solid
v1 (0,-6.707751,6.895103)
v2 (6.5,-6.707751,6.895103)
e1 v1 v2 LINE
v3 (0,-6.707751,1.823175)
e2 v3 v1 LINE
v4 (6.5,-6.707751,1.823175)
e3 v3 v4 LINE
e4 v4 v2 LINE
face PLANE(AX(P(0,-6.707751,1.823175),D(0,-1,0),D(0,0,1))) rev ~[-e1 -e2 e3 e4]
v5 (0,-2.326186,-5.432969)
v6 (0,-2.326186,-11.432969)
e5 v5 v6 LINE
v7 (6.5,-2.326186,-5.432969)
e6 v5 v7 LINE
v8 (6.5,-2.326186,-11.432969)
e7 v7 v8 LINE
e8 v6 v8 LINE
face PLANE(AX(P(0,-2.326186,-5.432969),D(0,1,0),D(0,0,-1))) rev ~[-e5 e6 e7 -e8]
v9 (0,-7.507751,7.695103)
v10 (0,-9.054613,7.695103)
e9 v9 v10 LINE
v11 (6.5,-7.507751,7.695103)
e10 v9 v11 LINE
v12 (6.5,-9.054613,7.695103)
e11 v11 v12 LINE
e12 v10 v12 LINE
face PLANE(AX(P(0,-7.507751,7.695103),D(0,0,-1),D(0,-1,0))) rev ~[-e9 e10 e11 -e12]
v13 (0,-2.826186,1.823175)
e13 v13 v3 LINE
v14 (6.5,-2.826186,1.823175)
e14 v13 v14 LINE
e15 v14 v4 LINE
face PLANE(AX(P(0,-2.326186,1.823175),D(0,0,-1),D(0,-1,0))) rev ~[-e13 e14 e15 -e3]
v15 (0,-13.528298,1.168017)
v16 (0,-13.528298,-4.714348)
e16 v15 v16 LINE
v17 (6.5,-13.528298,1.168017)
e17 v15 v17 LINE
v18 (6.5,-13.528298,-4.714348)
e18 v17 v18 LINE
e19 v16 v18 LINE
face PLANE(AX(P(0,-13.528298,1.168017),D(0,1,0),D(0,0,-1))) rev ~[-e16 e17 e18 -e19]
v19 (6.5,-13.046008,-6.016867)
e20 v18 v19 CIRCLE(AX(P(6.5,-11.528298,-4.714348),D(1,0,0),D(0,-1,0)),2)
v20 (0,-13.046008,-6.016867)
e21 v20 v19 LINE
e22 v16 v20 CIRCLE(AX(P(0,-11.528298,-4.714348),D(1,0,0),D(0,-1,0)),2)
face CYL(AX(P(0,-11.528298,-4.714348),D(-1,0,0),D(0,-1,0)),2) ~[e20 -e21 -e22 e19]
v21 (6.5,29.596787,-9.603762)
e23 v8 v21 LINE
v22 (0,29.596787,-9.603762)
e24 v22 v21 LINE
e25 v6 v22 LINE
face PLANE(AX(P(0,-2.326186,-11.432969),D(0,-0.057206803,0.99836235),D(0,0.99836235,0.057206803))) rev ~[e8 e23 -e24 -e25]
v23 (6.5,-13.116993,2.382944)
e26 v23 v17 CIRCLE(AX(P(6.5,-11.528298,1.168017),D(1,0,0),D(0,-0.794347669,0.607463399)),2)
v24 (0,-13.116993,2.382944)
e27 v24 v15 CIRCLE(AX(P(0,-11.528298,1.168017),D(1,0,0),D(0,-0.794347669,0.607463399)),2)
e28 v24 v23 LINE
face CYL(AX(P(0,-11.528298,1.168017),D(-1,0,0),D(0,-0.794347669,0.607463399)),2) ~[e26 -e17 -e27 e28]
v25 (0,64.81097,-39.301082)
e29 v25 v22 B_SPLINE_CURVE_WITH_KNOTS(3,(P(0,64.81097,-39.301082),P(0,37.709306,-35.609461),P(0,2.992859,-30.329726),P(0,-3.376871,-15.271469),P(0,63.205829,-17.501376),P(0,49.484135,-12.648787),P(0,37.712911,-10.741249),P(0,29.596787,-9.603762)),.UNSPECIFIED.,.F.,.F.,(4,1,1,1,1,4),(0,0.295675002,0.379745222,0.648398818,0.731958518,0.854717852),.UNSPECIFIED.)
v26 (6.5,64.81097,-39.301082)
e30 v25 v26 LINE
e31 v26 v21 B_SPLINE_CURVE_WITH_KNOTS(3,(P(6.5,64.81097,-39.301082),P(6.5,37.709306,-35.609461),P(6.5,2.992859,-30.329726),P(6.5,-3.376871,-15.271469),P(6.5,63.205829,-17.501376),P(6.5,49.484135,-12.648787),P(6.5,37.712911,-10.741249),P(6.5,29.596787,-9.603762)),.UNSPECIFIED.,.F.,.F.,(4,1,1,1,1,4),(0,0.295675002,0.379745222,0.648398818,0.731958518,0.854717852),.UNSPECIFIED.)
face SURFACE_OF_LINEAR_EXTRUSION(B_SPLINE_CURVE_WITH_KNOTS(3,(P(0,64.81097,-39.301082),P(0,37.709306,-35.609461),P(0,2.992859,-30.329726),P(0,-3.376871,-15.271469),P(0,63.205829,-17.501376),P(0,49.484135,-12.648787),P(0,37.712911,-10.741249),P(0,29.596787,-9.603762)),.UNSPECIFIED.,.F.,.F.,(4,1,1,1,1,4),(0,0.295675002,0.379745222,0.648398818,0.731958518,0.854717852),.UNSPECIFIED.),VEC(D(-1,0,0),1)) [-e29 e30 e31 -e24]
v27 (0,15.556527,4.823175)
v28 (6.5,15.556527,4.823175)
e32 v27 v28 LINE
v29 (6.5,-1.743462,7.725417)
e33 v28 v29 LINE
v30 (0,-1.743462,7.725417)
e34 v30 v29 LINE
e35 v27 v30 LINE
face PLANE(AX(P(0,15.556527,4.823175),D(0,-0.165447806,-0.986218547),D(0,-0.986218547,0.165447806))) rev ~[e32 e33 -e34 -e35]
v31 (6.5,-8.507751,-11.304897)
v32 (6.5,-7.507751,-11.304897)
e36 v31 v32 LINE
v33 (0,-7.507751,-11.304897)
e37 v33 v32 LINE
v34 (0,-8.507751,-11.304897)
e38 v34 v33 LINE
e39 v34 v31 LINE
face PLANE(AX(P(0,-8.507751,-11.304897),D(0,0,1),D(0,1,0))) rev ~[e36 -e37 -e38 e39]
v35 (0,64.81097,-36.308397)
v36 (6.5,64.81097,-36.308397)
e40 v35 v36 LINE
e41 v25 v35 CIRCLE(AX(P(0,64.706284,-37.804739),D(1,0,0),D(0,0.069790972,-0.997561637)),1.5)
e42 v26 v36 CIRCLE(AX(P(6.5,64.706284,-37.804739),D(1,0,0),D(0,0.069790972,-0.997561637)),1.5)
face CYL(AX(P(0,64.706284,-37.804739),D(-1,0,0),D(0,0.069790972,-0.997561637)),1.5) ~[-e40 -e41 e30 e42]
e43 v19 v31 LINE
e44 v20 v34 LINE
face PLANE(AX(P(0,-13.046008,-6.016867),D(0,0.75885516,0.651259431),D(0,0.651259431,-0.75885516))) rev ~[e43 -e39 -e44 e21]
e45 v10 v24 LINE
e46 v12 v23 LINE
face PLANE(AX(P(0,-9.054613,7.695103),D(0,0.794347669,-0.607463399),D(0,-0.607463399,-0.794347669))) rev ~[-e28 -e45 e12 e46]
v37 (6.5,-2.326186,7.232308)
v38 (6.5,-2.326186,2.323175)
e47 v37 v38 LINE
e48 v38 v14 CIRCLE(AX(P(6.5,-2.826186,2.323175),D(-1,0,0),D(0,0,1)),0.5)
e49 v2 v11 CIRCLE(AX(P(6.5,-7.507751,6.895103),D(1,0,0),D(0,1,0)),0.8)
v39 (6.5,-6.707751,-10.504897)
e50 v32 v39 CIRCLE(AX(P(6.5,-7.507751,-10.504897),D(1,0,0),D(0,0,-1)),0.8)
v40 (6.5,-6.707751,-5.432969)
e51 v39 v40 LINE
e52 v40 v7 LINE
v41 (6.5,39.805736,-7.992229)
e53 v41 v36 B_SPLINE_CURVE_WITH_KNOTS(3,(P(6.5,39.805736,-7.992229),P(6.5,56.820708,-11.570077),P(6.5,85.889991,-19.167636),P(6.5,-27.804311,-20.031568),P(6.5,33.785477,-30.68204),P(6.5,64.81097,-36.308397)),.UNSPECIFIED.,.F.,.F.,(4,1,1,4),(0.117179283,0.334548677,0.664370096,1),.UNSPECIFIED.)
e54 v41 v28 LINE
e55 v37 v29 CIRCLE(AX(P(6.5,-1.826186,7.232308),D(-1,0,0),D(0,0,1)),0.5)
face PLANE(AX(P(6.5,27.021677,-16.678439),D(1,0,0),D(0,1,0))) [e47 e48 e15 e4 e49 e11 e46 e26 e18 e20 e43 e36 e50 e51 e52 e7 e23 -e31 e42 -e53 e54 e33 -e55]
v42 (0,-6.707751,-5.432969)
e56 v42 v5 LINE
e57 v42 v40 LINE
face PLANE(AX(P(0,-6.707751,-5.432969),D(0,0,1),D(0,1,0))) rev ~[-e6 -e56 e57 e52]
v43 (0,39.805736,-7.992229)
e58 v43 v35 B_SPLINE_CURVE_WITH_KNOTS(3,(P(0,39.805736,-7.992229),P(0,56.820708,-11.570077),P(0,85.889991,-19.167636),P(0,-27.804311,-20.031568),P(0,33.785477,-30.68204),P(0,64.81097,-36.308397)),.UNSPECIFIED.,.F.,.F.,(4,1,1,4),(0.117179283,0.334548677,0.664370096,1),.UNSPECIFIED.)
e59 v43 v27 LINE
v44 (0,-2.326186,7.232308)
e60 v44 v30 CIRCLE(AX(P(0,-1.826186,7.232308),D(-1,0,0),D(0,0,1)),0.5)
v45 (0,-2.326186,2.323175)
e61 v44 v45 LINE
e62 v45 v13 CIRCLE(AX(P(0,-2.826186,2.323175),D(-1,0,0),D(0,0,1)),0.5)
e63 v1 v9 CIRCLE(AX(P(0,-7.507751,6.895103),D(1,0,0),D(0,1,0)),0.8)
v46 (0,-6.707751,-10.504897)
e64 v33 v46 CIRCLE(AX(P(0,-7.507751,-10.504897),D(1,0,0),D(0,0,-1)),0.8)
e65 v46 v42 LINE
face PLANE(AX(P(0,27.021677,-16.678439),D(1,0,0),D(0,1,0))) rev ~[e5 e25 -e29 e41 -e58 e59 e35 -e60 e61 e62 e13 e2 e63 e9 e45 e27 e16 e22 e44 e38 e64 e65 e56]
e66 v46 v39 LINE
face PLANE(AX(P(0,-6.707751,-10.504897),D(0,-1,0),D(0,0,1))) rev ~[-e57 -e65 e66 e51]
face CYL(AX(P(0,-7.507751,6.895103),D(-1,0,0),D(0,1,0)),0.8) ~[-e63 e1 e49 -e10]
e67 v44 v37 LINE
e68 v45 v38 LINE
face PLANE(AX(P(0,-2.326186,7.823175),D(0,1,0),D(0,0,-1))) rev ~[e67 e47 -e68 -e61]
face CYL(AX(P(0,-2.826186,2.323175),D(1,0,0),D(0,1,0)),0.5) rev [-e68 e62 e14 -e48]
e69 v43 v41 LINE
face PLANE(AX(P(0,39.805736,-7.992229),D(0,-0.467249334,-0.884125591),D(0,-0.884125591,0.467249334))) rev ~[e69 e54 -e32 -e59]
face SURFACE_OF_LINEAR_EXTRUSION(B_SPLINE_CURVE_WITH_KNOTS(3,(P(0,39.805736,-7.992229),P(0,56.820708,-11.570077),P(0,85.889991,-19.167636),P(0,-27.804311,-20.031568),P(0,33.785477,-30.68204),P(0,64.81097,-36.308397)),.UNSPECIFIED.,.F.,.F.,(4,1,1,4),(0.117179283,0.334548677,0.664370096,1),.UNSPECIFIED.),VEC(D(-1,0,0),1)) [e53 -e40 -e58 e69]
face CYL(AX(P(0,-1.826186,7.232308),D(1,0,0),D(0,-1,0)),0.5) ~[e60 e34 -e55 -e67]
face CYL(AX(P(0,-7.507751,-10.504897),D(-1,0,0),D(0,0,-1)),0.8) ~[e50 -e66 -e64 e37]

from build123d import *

# Parameters (mm, degrees)
F1_DEPTH = 6.5
F2_R     = 0.5


with BuildPart() as f1:
    # F0 (on Right) → F1 (new body)
    with BuildSketch(Plane.YZ):
        with BuildLine():
            Line((-2.3261857192, 7.8231747373), (-2.3261857192, 1.8231747373))
            Line((-2.3261857192, 1.8231747373), (-6.7077510927, 1.8231747373))
            Line((-6.7077510927, 1.8231747373), (-6.7077510927, 6.8951029659))
            ThreePointArc((-6.7077510927, 6.8951029659), (-6.9420656678, 7.4607883909), (-7.5077510927, 7.6951029659))
            Line((-7.5077510927, 7.6951029659), (-9.0546131166, 7.6951029659))
            Line((-9.0546131166, 7.6951029659), (-13.1169929958, 2.3829442588))
            ThreePointArc((-13.1169929958, 2.3829442588), (-13.4226828722, 1.8093478454), (-13.5282976587, 1.1680174602))
            Line((-13.5282976587, 1.1680174602), (-13.5282976587, -4.714347789))
            ThreePointArc((-13.5282976587, -4.714347789), (-13.4038536617, -5.40881858), (-13.0460079791, -6.01686665))
            Line((-13.0460079791, -6.01686665), (-8.5077510927, -11.3048970341))
            Line((-8.5077510927, -11.3048970341), (-7.5077510927, -11.3048970341))
            ThreePointArc((-7.5077510927, -11.3048970341), (-6.9420656678, -11.070582459), (-6.7077510927, -10.5048970341))
            Line((-6.7077510927, -10.5048970341), (-6.7077510927, -5.4329688054))
            Line((-6.7077510927, -5.4329688054), (-2.3261857192, -5.4329688054))
            add(Edge.make_bspline(
                [(29.5967873893, -9.603761956), (19.9915875977, -8.2575789777), (8.8285316572, -6.9078858502), (-2.3261857192, -5.4329688054)],
                knots=[0.854717852, 0.854717852, 0.854717852, 0.854717852, 1, 1, 1, 1], degree=3))
            add(Edge.make_bspline(
                [(64.8109703191, -39.3010818437), (37.7093056162, -35.6094605608), (2.9928587329, -30.3297260774), (-3.3768708565, -15.2714692161), (63.2058288641, -17.5013760989), (49.4841345426, -12.6487868731), (37.7129114005, -10.741248758), (29.5967873893, -9.603761956)],
                knots=[0, 0, 0, 0, 0.2956750024, 0.3797452222, 0.6483988176, 0.731958518, 0.854717852, 0.854717852, 0.854717852, 0.854717852], degree=3))
            ThreePointArc((64.8109703191, -39.3010818437), (66.206283861, -37.8047393877), (64.8109703191, -36.3083969317))
            add(Edge.make_bspline(
                [(39.8057358281, -7.9922291512), (56.820708357, -11.5700774026), (85.8899906987, -19.167635592), (-27.804311403, -20.0315678799), (33.7854768957, -30.6820395077), (64.8109703191, -36.3083969317)],
                knots=[0.1171792834, 0.1171792834, 0.1171792834, 0.1171792834, 0.3345486768, 0.664370096, 1, 1, 1, 1], degree=3))
            Line((39.8057358281, -7.9922291512), (15.5565273017, 4.8231747373))
            Line((15.5565273017, 4.8231747373), (-2.3261857192, 7.8231747373))
        make_face()
        with BuildLine():
            Line((-2.3261857192, -11.4329688054), (29.5967873893, -9.603761956))
            add(Edge.make_bspline(
                [(29.5967873893, -9.603761956), (19.9915875977, -8.2575789777), (8.8285316572, -6.9078858502), (-2.3261857192, -5.4329688054)],
                knots=[0.854717852, 0.854717852, 0.854717852, 0.854717852, 1, 1, 1, 1], degree=3))
            Line((-2.3261857192, -5.4329688054), (-2.3261857192, -11.4329688054))
        make_face()
    extrude(amount=F1_DEPTH)

    # F2
    f2_edges = [f1.edges().sort_by_distance(p)[0] for p in [
        (3.25, -2.326186, 7.823175),
        (3.25, -2.326186, 1.823175),
    ]]
    fillet(f2_edges, radius=F2_R)


solid = f1.part
